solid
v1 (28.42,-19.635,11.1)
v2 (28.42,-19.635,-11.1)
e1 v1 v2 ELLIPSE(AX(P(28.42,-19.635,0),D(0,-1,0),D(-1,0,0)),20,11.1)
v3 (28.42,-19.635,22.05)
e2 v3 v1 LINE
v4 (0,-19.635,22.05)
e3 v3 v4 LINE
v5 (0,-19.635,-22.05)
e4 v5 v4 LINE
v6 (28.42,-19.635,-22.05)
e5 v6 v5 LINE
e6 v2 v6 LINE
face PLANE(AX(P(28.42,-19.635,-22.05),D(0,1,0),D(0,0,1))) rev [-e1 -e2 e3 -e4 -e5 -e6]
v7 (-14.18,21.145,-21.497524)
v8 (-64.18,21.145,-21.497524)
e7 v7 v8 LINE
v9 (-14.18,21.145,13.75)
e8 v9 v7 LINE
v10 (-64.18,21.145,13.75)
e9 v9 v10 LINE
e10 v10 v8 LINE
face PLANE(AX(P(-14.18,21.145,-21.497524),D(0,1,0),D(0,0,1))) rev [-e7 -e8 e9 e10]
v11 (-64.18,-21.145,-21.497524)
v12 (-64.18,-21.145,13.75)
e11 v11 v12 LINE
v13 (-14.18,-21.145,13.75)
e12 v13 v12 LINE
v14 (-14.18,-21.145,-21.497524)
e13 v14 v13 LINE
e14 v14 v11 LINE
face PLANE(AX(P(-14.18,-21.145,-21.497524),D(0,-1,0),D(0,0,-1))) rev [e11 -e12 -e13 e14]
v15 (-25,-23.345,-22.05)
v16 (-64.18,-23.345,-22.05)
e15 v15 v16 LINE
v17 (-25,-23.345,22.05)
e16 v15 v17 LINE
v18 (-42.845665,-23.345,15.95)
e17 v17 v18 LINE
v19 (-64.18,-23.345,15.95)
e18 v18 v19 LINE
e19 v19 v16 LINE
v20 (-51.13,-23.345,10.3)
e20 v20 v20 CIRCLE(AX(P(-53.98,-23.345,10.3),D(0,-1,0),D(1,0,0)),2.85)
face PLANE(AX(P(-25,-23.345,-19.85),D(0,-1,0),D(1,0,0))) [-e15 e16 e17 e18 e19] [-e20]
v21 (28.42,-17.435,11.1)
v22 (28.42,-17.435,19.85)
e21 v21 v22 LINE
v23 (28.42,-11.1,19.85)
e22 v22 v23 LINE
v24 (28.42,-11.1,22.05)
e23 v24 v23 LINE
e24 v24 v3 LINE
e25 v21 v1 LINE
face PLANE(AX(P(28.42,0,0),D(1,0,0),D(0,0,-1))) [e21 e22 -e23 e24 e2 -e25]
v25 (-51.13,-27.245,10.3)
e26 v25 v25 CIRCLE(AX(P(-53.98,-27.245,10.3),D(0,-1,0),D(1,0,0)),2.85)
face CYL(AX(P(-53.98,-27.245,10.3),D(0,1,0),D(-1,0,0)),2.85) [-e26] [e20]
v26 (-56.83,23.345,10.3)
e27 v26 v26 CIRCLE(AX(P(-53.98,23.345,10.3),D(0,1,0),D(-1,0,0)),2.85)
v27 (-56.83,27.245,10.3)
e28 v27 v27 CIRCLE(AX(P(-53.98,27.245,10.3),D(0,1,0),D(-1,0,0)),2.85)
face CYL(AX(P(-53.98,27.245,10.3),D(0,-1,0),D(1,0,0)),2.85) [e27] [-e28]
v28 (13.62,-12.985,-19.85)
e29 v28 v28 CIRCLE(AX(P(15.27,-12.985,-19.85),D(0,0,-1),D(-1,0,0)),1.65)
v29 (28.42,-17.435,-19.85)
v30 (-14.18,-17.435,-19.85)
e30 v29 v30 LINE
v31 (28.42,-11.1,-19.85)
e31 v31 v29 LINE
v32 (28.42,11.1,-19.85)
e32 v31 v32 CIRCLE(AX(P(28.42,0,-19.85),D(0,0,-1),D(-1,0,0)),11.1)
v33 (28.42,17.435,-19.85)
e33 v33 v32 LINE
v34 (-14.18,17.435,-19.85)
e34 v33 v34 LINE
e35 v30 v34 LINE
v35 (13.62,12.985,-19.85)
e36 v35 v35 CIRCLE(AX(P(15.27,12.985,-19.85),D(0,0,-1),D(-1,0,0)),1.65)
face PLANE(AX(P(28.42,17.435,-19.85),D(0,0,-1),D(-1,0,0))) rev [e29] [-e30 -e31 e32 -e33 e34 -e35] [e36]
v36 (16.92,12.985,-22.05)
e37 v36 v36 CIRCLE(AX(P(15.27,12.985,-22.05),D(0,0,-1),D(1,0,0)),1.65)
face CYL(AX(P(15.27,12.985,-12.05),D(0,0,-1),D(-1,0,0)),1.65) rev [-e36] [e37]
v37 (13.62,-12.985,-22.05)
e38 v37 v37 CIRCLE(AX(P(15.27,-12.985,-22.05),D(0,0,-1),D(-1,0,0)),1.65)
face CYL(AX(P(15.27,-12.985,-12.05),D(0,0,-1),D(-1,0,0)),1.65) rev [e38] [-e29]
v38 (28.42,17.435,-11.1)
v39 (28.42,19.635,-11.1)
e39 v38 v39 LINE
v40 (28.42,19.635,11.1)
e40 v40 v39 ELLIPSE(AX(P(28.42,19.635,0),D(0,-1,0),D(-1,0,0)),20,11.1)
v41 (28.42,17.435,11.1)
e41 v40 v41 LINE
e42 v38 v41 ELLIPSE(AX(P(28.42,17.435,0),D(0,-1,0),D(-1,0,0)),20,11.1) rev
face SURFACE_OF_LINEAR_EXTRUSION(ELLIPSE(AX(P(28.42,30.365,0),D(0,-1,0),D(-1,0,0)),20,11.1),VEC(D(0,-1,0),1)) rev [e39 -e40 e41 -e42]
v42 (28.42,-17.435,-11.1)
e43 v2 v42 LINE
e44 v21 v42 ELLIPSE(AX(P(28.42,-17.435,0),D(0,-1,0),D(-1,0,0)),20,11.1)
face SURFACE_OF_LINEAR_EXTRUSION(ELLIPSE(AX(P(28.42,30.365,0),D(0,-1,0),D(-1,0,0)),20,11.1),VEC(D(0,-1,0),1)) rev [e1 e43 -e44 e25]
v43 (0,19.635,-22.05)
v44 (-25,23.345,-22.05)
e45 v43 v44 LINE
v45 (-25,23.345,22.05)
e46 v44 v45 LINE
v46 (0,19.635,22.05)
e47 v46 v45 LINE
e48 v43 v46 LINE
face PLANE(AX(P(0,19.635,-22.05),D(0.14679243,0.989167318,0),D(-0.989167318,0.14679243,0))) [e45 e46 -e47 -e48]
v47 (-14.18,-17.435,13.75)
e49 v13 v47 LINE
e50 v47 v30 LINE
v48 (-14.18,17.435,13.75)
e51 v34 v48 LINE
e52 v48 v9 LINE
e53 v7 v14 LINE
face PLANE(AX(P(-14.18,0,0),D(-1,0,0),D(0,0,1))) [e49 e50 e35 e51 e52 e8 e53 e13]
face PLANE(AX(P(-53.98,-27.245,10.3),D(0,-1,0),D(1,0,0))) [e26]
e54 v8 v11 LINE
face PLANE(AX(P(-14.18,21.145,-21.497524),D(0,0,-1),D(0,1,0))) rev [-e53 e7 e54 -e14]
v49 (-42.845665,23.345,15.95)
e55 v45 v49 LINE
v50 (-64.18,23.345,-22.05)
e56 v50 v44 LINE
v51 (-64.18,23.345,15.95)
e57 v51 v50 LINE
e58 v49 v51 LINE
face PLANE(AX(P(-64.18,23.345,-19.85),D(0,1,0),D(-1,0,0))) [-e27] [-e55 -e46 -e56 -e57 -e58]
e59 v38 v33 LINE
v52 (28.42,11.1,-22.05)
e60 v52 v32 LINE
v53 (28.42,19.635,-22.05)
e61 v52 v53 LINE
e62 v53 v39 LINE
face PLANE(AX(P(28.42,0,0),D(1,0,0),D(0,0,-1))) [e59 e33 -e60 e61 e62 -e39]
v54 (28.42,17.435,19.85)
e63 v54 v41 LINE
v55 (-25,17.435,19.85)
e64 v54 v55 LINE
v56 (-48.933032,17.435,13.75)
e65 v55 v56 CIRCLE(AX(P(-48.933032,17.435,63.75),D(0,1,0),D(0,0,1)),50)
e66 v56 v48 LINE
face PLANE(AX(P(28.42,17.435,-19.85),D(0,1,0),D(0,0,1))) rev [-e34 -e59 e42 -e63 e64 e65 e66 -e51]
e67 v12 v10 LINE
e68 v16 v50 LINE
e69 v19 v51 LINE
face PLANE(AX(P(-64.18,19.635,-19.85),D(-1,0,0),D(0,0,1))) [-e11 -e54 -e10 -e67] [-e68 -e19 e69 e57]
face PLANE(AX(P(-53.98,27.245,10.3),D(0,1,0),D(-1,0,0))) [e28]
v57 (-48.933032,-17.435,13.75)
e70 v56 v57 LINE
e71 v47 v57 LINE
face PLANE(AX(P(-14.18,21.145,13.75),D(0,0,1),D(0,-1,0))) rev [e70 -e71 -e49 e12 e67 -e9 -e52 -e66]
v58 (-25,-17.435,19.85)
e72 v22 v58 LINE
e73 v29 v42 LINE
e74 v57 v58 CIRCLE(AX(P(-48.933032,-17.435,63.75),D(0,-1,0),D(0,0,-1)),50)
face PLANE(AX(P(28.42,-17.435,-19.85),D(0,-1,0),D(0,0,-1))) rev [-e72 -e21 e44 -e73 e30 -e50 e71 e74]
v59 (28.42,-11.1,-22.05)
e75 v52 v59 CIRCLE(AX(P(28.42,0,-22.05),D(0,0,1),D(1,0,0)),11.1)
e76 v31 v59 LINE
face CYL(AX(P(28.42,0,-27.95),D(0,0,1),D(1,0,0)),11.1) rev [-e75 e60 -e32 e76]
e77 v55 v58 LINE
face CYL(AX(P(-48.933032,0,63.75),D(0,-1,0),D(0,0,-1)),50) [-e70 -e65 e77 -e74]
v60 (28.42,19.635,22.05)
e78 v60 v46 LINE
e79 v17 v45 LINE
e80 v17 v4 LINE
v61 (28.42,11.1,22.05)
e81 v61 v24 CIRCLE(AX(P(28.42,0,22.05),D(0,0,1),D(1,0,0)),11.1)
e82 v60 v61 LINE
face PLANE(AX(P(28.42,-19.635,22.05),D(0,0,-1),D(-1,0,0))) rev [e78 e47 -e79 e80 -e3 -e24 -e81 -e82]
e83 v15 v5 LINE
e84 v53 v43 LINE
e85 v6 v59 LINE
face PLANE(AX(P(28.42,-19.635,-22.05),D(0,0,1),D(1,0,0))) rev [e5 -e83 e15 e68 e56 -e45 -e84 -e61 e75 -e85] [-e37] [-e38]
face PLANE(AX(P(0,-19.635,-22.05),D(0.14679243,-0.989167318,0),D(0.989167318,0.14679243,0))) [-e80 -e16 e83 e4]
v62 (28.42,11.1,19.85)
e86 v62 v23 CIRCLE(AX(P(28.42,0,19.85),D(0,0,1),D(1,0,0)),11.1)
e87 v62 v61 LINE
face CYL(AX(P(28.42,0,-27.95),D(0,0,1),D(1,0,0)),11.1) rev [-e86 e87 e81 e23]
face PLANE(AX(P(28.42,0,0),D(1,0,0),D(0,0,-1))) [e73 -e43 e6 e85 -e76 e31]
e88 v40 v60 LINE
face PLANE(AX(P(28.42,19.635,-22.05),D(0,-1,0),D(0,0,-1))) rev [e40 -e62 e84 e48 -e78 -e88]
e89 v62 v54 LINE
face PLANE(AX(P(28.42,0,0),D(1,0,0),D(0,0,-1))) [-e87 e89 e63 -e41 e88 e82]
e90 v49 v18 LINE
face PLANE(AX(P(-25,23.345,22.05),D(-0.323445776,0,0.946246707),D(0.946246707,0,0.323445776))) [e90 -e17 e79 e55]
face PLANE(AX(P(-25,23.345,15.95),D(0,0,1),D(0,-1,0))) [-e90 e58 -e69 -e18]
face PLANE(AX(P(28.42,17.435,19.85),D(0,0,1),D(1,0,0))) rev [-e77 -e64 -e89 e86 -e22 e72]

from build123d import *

# Parameters (mm, degrees)
ESQUISSE1_W             = 44.1
ESQUISSE1_H             = 39.27
BOSS_EXTRU_1_DEPTH      = 28.42
ESQUISSE2_W             = 39.7
ESQUISSE2_H             = 34.87
ENL_V_MAT_EXTRU_1_DEPTH = 28.42
ESQUISSE3_R             = 11.1
ENL_V_MAT_EXTRU_2_DEPTH = 50
ESQUISSE4_RX            = 20
ESQUISSE4_RY            = 11.1
ENL_V_MAT_EXTRU_3_DEPTH = 50
ESQUISSE5_R             = 1.65
ENL_V_MAT_EXTRU_4_DEPTH = 10
ESQUISSE6_W             = 64.18
ESQUISSE6_H             = 39.27
BOSS_EXTRU_2_DEPTH      = 2.2
ESQUISSE8_W             = 44.1
ESQUISSE8_H             = 39.27
BOSS_EXTRU_3_DEPTH      = 25
BOSS_EXTRU_4_DEPTH      = 44.1
BOSS_EXTRU_5_START      = -2.2
ESQUISSE13_W            = 39.18
ESQUISSE13_H            = 3.71
BOSS_EXTRU_5_DEPTH      = 2.2
ESQUISSE14_W            = 39.7
ESQUISSE14_H            = 34.87
ENL_V_MAT_EXTRU_5_DEPTH = 25
ESQUISSE17_W            = 38
ESQUISSE17_H            = 46.69
BOSS_EXTRU_6_DEPTH      = 39.18
ESQUISSE18_W            = 35.2475242
ESQUISSE18_H            = 42.29
ENL_V_MAT_EXTRU_6_DEPTH = 50
BOSS_EXTRU_7_DEPTH      = 46.69
CONG_1_R                = 50
ESQUISSE23_R            = 2.85
BOSS_EXTRU_8_DEPTH      = 3.9
BOSS_EXTRU_9_START      = 3.9
ESQUISSE26_R            = 2.85
BOSS_EXTRU_9_DEPTH      = 3.9


with BuildPart() as part:
    # Esquisse1 → Boss.-Extru.1 (new body)
    with BuildSketch(Plane(origin=(0, 0, 0), x_dir=(0, 0, -1), z_dir=(1, 0, 0))):
        Rectangle(ESQUISSE1_W, ESQUISSE1_H)
    extrude(amount=BOSS_EXTRU_1_DEPTH)

    # Esquisse2 → Enlèv. mat.-Extru.1 (cut)
    with BuildSketch(Plane.ZY):
        Rectangle(ESQUISSE2_W, ESQUISSE2_H)
    extrude(amount=-ENL_V_MAT_EXTRU_1_DEPTH, mode=Mode.SUBTRACT)

    # Esquisse3 → Enlèv. mat.-Extru.2 (cut)
    with BuildSketch(Plane.XY.offset(22.05)):
        with Locations((28.42, 0)):
            Circle(ESQUISSE3_R)
    extrude(amount=-ENL_V_MAT_EXTRU_2_DEPTH, mode=Mode.SUBTRACT)

    # Esquisse4 → Enlèv. mat.-Extru.3 (cut)
    with BuildSketch(Plane.XZ.offset(19.635)):
        with Locations(Location((28.42, 0), (0, 0, -180))):
            Ellipse(ESQUISSE4_RX, ESQUISSE4_RY)
    extrude(amount=-ENL_V_MAT_EXTRU_3_DEPTH, mode=Mode.SUBTRACT)

    # Esquisse5 → Enlèv. mat.-Extru.4 (cut)
    with BuildSketch(Plane(origin=(0, 0, -22.05), x_dir=(-1, 0, 0), z_dir=(0, 0, -1))):
        with Locations((-15.27, -12.985)):
            Circle(ESQUISSE5_R)
        with Locations((-15.27, 12.985)):
            Circle(ESQUISSE5_R)
    extrude(amount=-ENL_V_MAT_EXTRU_4_DEPTH, mode=Mode.SUBTRACT)

    # Esquisse6 → Boss.-Extru.2 (add)
    with BuildSketch(Plane(origin=(0, 0, -22.05), x_dir=(-1, 0, 0), z_dir=(0, 0, -1))):
        with Locations((32.09, 0)):
            Rectangle(ESQUISSE6_W, ESQUISSE6_H)
    extrude(amount=-BOSS_EXTRU_2_DEPTH)

    # Esquisse8 → Boss.-Extru.3 (add)
    with BuildSketch(Plane.ZY):
        Rectangle(ESQUISSE8_W, ESQUISSE8_H)
    extrude(amount=BOSS_EXTRU_3_DEPTH)

    # Esquisse10 → Boss.-Extru.4 (add)
    with BuildSketch(Plane.XY.offset(22.05)):
        Polygon((-25, -19.635), (0, -19.635), (-25, -23.345), align=None)
        Polygon((-25, 19.635), (0, 19.635), (-25, 23.345), align=None)
    extrude(amount=-BOSS_EXTRU_4_DEPTH)

    # Esquisse13 → Boss.-Extru.5 (add)
    with BuildSketch(Plane(origin=(0, 0, -22.05), x_dir=(-1, 0, 0), z_dir=(0, 0, -1)).offset(BOSS_EXTRU_5_START)):
        with Locations((44.59, 21.49)):
            Rectangle(ESQUISSE13_W, ESQUISSE13_H)
        with Locations((44.59, -21.49)):
            Rectangle(ESQUISSE13_W, ESQUISSE13_H)
    extrude(amount=BOSS_EXTRU_5_DEPTH)

    # Esquisse14 → Enlèv. mat.-Extru.5 (cut)
    with BuildSketch(Plane(origin=(0, 0, 0), x_dir=(0, 0, -1), z_dir=(1, 0, 0))):
        Rectangle(ESQUISSE14_W, ESQUISSE14_H)
    extrude(amount=-ENL_V_MAT_EXTRU_5_DEPTH, mode=Mode.SUBTRACT)

    # Esquisse17 → Boss.-Extru.6 (add)
    with BuildSketch(Plane.ZY.offset(64.18)):
        with Locations((-3.05, 0)):
            Rectangle(ESQUISSE17_W, ESQUISSE17_H)
    extrude(amount=-BOSS_EXTRU_6_DEPTH)

    # Esquisse18 → Enlèv. mat.-Extru.6 (cut)
    with BuildSketch(Plane.ZY.offset(64.18)):
        with Locations((-3.8737621, 0)):
            Rectangle(ESQUISSE18_W, ESQUISSE18_H)
    extrude(amount=-ENL_V_MAT_EXTRU_6_DEPTH, mode=Mode.SUBTRACT)

    # Esquisse22 → Boss.-Extru.7 (add)
    with BuildSketch(Plane.XZ.offset(23.345)):
        Polygon((-42.845664821, 15.95), (-25, 15.95), (-25, 22.05), align=None)
    extrude(amount=-BOSS_EXTRU_7_DEPTH)

    # Congé1
    # the kernel refuses this fillet: 50 mm, written as the material it takes off along each edge
    with BuildSketch(Plane(origin=(-25, 17.435, 13.75), x_dir=(0, 0, 1), z_dir=(0, -1, 0))) as cong_1_piece_1:
        with BuildLine():
            CenterArc((50, 23.933031567), CONG_1_R, 180, 28.597962222)
            Line((0, 23.933031567), (0, 0))
            Line((0, 0), (6.1, 0))
        make_face()
    extrude(amount=34.87, mode=Mode.SUBTRACT)

    # Esquisse23 → Boss.-Extru.8 (add)
    with BuildSketch(Plane(origin=(0, 23.345, 0), x_dir=(1, 0, 0), z_dir=(0, 1, 0))):
        with Locations(Location((-53.98, -10.3, 0), (0, 0, 180))):
            Circle(ESQUISSE23_R)
    extrude(amount=BOSS_EXTRU_8_DEPTH)

    # Esquisse26 → Boss.-Extru.9 (add)
    with BuildSketch(Plane.XZ.offset(23.345).offset(BOSS_EXTRU_9_START)):
        with Locations(Location((-53.98, 10.3, 0), (0, 0, 180))):
            Circle(ESQUISSE26_R)
    extrude(amount=-BOSS_EXTRU_9_DEPTH)


solid = part.part
